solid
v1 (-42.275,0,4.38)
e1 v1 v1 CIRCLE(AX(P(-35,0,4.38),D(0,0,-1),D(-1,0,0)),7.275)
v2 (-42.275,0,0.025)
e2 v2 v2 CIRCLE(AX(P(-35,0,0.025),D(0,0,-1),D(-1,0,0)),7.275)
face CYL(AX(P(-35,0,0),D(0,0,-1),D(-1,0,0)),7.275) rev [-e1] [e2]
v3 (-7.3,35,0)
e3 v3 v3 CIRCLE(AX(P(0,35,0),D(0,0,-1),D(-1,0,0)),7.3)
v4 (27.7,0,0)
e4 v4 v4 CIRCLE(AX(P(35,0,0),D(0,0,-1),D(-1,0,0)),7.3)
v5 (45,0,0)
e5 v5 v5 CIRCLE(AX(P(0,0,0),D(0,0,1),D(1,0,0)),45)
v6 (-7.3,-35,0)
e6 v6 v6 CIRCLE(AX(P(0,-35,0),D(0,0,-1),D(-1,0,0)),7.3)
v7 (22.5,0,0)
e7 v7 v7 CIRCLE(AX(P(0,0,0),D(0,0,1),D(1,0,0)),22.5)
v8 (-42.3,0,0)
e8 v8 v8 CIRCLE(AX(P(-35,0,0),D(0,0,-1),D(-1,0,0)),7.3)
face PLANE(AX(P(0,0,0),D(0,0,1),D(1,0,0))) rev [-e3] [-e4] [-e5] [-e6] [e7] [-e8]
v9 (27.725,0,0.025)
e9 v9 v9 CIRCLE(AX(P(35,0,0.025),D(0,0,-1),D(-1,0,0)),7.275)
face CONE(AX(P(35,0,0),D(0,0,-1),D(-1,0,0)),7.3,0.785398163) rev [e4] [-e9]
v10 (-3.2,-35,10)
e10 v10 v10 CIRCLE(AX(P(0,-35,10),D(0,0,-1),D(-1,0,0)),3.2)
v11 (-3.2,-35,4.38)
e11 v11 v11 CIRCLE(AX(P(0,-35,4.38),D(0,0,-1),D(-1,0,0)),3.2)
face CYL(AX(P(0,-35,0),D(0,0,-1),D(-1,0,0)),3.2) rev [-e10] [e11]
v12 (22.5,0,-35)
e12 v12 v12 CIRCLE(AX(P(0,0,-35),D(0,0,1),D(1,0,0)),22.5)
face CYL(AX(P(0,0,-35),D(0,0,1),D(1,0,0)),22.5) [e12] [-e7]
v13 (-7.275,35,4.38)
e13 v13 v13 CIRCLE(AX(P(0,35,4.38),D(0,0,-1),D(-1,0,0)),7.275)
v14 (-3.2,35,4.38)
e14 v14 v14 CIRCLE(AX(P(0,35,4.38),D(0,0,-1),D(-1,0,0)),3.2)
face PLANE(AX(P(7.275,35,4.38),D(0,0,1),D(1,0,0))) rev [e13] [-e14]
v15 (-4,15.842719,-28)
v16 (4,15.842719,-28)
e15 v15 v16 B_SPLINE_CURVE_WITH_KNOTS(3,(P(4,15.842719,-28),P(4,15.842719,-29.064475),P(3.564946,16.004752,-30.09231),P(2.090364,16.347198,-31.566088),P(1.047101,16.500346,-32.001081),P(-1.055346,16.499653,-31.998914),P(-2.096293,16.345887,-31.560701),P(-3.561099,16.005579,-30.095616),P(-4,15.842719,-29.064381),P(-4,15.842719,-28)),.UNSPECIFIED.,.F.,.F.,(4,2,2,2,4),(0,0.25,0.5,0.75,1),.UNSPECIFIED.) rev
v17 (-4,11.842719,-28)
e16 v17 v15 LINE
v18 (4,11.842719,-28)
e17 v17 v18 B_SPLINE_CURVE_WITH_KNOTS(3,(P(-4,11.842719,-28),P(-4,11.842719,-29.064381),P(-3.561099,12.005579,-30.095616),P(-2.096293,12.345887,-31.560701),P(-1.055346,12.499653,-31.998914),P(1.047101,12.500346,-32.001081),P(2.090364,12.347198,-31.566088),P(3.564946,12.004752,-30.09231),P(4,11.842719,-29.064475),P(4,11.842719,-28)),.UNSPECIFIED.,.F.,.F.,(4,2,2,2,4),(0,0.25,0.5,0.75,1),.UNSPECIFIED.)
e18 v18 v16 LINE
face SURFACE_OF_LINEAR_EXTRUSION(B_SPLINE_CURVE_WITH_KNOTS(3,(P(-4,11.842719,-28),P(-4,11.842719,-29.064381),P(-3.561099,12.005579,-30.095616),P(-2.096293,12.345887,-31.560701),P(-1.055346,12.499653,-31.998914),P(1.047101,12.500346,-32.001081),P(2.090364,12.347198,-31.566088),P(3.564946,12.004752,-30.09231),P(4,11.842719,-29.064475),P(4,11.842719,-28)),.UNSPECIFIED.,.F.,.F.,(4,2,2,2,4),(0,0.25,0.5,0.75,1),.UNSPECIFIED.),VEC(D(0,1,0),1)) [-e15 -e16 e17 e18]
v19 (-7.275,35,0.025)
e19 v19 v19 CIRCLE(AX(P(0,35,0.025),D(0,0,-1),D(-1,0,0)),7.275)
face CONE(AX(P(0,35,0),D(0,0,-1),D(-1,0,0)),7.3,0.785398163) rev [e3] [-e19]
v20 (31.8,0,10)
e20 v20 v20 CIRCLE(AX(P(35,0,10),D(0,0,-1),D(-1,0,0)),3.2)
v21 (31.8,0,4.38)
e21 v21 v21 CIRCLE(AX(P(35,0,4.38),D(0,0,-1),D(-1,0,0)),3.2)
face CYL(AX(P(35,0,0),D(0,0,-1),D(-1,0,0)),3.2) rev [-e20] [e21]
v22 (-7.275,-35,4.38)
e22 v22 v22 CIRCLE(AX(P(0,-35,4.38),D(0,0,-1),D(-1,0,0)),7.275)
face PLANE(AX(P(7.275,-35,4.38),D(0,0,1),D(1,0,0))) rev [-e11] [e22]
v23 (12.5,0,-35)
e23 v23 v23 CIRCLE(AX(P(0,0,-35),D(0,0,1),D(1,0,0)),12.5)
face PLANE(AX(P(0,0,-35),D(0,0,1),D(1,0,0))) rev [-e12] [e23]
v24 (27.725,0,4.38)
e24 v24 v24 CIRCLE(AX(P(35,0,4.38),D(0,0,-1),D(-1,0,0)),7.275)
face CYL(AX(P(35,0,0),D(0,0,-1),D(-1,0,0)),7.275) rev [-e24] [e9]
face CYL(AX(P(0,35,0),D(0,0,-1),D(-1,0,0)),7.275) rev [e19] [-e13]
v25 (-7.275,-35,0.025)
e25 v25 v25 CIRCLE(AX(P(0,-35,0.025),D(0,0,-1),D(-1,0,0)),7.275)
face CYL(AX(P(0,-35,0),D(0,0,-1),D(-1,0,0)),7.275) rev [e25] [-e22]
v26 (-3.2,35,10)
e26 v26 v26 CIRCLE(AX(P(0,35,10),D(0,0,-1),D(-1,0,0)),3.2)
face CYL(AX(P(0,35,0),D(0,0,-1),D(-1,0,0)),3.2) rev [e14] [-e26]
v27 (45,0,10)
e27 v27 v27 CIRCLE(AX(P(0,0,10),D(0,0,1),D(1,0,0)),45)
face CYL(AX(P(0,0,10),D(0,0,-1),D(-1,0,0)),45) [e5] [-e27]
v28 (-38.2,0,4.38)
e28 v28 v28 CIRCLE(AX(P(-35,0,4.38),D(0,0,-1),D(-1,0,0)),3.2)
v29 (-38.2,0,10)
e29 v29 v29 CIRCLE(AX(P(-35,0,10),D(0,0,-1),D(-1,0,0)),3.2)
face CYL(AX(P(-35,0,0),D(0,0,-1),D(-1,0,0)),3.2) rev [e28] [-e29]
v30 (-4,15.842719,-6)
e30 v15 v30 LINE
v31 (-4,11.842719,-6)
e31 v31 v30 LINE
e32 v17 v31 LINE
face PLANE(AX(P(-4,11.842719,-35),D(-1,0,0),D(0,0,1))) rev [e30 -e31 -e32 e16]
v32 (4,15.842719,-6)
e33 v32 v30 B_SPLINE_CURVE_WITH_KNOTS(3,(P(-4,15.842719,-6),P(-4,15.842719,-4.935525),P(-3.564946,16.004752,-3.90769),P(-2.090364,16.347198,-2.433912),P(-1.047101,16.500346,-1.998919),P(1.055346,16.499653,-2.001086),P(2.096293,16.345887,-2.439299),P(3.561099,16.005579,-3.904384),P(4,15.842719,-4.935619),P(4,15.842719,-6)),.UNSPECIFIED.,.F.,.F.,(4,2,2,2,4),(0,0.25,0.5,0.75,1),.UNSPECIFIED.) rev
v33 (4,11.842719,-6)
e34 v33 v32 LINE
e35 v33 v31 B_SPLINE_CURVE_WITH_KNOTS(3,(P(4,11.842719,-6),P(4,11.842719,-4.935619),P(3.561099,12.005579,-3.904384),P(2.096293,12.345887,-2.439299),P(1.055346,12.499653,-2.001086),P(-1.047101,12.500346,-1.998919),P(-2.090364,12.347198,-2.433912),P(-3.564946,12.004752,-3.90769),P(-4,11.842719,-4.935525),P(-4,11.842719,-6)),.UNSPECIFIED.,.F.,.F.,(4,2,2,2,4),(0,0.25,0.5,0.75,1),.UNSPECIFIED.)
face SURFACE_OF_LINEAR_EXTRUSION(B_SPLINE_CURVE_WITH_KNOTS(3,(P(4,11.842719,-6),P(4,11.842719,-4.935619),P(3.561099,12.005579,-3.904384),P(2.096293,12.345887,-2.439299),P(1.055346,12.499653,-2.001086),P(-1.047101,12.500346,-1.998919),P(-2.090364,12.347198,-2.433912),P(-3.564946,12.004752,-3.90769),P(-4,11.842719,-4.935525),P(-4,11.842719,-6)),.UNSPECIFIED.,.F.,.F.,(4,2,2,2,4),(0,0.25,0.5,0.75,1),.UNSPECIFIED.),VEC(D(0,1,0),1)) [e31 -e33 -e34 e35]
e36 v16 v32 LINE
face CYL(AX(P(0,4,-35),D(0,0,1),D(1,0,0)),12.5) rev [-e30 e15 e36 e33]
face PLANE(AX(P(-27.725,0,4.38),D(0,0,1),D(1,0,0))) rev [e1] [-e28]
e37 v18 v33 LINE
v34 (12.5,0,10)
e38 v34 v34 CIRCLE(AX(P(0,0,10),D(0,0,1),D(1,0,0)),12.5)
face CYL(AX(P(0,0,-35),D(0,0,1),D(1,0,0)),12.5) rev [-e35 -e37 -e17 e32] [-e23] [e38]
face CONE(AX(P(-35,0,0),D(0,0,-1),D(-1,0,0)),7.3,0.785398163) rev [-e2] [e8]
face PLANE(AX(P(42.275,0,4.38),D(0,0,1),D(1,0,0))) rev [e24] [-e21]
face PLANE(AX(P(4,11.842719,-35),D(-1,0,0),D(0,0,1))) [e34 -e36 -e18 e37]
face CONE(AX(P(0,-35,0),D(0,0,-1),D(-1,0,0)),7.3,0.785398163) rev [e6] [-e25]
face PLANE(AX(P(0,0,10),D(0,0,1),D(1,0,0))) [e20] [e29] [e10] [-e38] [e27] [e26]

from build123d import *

# Parameters (mm, degrees)
SKETCH1_R                              = 22.5
SKETCH1_R_2                            = 12.5
BOSS_EXTRUDE1_DEPTH                    = 35
BOSS_EXTRUDE2_START                    = 10
SKETCH2_R                              = 45
SKETCH2_R_2                            = 12.5
BOSS_EXTRUDE2_DEPTH                    = 10
CUT_EXTRUDE1_START                     = 11
CUT_EXTRUDE1_DEPTH                     = 5.500000008
CUT_EXTRUDE1_START_2                   = -33
CUT_EXTRUDE1_2_DEPTH                   = 32
CBORE_FOR_M6_HEX_HEAD_BOLT1_AT_2_COUNT = 2
CBORE_FOR_M6_HEX_HEAD_BOLT1_AT_2_PITCH = 49.497474683
CBORE_FOR_M6_HEX_HEAD_BOLT1_AT_3_COUNT = 2
CBORE_FOR_M6_HEX_HEAD_BOLT1_AT_3_PITCH = 70
CBORE_FOR_M6_HEX_HEAD_BOLT1_AT_4_COUNT = 2
CBORE_FOR_M6_HEX_HEAD_BOLT1_AT_4_PITCH = 49.497474683


with BuildPart() as part:
    # Sketch1 → Boss-Extrude1 (new body)
    with BuildSketch(Plane.XY):
        Circle(SKETCH1_R)
        Circle(SKETCH1_R_2, mode=Mode.SUBTRACT)
    extrude(amount=-BOSS_EXTRUDE1_DEPTH)

    # Sketch2 → Boss-Extrude2 (add)
    with BuildSketch(Plane.XY.offset(BOSS_EXTRUDE2_START)):
        Circle(SKETCH2_R)
        Circle(SKETCH2_R_2, mode=Mode.SUBTRACT)
    extrude(amount=-BOSS_EXTRUDE2_DEPTH)

    # Cut-Extrude1: read off the stored shape, not the designer's step
    # Cut-Extrude1 outline → Cut-Extrude1 (cut)
    with BuildSketch(Plane(origin=(0, 0, 0), x_dir=(1, 0, 0), z_dir=(0, 1, 0)).offset(CUT_EXTRUDE1_START)):
        with BuildLine():
            add(Edge.make_bspline(
                [(-4, 28), (-4, 29.064380904), (-3.561099342, 30.095615587), (-2.096292766, 31.560700753), (-1.055346498, 31.998914356), (1.04710073, 32.001081394), (2.090364215, 31.566087585), (3.564946316, 30.092309962), (4, 29.064475319), (4, 28)],
                knots=[0, 0, 0, 0, 0.25, 0.25, 0.5, 0.5, 0.75, 0.75, 1, 1, 1, 1], degree=3))
            Line((-4, 28), (-4, 6))
            add(Edge.make_bspline(
                [(4, 6), (4, 4.935619096), (3.561099342, 3.904384413), (2.096292766, 2.439299247), (1.055346498, 2.001085644), (-1.04710073, 1.998918606), (-2.090364215, 2.433912415), (-3.564946316, 3.907690038), (-4, 4.935524681), (-4, 6)],
                knots=[0, 0, 0, 0, 0.25, 0.25, 0.5, 0.5, 0.75, 0.75, 1, 1, 1, 1], degree=3))
            Line((4, 6), (4, 28))
        make_face()
    extrude(amount=CUT_EXTRUDE1_DEPTH, mode=Mode.SUBTRACT)

    # Cut-Extrude1 2 outline → Cut-Extrude1 2 (add)
    with BuildSketch(Plane.XY.offset(CUT_EXTRUDE1_START_2)):
        with BuildLine():
            ThreePointArc((-4, 15.842719282), (-2.026821151, 16.334585361), (2.53e-07, 16.5))
            Line((2.53e-07, 16.5), (-4, 16.500000008))
            Line((-4, 16.500000008), (-4, 15.842719282))
        make_face()
        with BuildLine():
            ThreePointArc((2.53e-07, 16.5), (2.026821401, 16.33458532), (4, 15.842719282))
            Line((4, 15.842719282), (4, 16.500000008))
            Line((4, 16.500000008), (2.53e-07, 16.5))
        make_face()
    extrude(amount=CUT_EXTRUDE1_2_DEPTH)

    # Sketch5 → CBORE for M6 Hex Head Bolt1 (revolve, cut)
    with BuildSketch(Plane.YZ.offset(35)):
        Polygon((0, 0), (0, 10), (3.2, 10), (3.2, 4.38), (7.275, 4.38), (7.275, 0.025), (7.3, 0), align=None)
    cbore_for_m6_hex_head_bolt1 = revolve(axis=Axis((35, 0, -6.35), (0, 0, 1)), mode=Mode.SUBTRACT)

    # CBORE for M6 Hex Head Bolt1 at 2: CBORE for M6 Hex Head Bolt1 ×2
    with Locations(*[Vector(-0.7071067811865512, 0.7071067811865438, 0) * (i * CBORE_FOR_M6_HEX_HEAD_BOLT1_AT_2_PITCH) for i in range(1, CBORE_FOR_M6_HEX_HEAD_BOLT1_AT_2_COUNT)]):
        add(cbore_for_m6_hex_head_bolt1, mode=Mode.SUBTRACT)

    # CBORE for M6 Hex Head Bolt1 at 3: CBORE for M6 Hex Head Bolt1 ×2
    with Locations(*[(-i * CBORE_FOR_M6_HEX_HEAD_BOLT1_AT_3_PITCH, 0, 0) for i in range(1, CBORE_FOR_M6_HEX_HEAD_BOLT1_AT_3_COUNT)]):
        add(cbore_for_m6_hex_head_bolt1, mode=Mode.SUBTRACT)

    # CBORE for M6 Hex Head Bolt1 at 4: CBORE for M6 Hex Head Bolt1 ×2
    with Locations(*[Vector(-0.7071067811865414, -0.7071067811865538, 0) * (i * CBORE_FOR_M6_HEX_HEAD_BOLT1_AT_4_PITCH) for i in range(1, CBORE_FOR_M6_HEX_HEAD_BOLT1_AT_4_COUNT)]):
        add(cbore_for_m6_hex_head_bolt1, mode=Mode.SUBTRACT)


solid = part.part
